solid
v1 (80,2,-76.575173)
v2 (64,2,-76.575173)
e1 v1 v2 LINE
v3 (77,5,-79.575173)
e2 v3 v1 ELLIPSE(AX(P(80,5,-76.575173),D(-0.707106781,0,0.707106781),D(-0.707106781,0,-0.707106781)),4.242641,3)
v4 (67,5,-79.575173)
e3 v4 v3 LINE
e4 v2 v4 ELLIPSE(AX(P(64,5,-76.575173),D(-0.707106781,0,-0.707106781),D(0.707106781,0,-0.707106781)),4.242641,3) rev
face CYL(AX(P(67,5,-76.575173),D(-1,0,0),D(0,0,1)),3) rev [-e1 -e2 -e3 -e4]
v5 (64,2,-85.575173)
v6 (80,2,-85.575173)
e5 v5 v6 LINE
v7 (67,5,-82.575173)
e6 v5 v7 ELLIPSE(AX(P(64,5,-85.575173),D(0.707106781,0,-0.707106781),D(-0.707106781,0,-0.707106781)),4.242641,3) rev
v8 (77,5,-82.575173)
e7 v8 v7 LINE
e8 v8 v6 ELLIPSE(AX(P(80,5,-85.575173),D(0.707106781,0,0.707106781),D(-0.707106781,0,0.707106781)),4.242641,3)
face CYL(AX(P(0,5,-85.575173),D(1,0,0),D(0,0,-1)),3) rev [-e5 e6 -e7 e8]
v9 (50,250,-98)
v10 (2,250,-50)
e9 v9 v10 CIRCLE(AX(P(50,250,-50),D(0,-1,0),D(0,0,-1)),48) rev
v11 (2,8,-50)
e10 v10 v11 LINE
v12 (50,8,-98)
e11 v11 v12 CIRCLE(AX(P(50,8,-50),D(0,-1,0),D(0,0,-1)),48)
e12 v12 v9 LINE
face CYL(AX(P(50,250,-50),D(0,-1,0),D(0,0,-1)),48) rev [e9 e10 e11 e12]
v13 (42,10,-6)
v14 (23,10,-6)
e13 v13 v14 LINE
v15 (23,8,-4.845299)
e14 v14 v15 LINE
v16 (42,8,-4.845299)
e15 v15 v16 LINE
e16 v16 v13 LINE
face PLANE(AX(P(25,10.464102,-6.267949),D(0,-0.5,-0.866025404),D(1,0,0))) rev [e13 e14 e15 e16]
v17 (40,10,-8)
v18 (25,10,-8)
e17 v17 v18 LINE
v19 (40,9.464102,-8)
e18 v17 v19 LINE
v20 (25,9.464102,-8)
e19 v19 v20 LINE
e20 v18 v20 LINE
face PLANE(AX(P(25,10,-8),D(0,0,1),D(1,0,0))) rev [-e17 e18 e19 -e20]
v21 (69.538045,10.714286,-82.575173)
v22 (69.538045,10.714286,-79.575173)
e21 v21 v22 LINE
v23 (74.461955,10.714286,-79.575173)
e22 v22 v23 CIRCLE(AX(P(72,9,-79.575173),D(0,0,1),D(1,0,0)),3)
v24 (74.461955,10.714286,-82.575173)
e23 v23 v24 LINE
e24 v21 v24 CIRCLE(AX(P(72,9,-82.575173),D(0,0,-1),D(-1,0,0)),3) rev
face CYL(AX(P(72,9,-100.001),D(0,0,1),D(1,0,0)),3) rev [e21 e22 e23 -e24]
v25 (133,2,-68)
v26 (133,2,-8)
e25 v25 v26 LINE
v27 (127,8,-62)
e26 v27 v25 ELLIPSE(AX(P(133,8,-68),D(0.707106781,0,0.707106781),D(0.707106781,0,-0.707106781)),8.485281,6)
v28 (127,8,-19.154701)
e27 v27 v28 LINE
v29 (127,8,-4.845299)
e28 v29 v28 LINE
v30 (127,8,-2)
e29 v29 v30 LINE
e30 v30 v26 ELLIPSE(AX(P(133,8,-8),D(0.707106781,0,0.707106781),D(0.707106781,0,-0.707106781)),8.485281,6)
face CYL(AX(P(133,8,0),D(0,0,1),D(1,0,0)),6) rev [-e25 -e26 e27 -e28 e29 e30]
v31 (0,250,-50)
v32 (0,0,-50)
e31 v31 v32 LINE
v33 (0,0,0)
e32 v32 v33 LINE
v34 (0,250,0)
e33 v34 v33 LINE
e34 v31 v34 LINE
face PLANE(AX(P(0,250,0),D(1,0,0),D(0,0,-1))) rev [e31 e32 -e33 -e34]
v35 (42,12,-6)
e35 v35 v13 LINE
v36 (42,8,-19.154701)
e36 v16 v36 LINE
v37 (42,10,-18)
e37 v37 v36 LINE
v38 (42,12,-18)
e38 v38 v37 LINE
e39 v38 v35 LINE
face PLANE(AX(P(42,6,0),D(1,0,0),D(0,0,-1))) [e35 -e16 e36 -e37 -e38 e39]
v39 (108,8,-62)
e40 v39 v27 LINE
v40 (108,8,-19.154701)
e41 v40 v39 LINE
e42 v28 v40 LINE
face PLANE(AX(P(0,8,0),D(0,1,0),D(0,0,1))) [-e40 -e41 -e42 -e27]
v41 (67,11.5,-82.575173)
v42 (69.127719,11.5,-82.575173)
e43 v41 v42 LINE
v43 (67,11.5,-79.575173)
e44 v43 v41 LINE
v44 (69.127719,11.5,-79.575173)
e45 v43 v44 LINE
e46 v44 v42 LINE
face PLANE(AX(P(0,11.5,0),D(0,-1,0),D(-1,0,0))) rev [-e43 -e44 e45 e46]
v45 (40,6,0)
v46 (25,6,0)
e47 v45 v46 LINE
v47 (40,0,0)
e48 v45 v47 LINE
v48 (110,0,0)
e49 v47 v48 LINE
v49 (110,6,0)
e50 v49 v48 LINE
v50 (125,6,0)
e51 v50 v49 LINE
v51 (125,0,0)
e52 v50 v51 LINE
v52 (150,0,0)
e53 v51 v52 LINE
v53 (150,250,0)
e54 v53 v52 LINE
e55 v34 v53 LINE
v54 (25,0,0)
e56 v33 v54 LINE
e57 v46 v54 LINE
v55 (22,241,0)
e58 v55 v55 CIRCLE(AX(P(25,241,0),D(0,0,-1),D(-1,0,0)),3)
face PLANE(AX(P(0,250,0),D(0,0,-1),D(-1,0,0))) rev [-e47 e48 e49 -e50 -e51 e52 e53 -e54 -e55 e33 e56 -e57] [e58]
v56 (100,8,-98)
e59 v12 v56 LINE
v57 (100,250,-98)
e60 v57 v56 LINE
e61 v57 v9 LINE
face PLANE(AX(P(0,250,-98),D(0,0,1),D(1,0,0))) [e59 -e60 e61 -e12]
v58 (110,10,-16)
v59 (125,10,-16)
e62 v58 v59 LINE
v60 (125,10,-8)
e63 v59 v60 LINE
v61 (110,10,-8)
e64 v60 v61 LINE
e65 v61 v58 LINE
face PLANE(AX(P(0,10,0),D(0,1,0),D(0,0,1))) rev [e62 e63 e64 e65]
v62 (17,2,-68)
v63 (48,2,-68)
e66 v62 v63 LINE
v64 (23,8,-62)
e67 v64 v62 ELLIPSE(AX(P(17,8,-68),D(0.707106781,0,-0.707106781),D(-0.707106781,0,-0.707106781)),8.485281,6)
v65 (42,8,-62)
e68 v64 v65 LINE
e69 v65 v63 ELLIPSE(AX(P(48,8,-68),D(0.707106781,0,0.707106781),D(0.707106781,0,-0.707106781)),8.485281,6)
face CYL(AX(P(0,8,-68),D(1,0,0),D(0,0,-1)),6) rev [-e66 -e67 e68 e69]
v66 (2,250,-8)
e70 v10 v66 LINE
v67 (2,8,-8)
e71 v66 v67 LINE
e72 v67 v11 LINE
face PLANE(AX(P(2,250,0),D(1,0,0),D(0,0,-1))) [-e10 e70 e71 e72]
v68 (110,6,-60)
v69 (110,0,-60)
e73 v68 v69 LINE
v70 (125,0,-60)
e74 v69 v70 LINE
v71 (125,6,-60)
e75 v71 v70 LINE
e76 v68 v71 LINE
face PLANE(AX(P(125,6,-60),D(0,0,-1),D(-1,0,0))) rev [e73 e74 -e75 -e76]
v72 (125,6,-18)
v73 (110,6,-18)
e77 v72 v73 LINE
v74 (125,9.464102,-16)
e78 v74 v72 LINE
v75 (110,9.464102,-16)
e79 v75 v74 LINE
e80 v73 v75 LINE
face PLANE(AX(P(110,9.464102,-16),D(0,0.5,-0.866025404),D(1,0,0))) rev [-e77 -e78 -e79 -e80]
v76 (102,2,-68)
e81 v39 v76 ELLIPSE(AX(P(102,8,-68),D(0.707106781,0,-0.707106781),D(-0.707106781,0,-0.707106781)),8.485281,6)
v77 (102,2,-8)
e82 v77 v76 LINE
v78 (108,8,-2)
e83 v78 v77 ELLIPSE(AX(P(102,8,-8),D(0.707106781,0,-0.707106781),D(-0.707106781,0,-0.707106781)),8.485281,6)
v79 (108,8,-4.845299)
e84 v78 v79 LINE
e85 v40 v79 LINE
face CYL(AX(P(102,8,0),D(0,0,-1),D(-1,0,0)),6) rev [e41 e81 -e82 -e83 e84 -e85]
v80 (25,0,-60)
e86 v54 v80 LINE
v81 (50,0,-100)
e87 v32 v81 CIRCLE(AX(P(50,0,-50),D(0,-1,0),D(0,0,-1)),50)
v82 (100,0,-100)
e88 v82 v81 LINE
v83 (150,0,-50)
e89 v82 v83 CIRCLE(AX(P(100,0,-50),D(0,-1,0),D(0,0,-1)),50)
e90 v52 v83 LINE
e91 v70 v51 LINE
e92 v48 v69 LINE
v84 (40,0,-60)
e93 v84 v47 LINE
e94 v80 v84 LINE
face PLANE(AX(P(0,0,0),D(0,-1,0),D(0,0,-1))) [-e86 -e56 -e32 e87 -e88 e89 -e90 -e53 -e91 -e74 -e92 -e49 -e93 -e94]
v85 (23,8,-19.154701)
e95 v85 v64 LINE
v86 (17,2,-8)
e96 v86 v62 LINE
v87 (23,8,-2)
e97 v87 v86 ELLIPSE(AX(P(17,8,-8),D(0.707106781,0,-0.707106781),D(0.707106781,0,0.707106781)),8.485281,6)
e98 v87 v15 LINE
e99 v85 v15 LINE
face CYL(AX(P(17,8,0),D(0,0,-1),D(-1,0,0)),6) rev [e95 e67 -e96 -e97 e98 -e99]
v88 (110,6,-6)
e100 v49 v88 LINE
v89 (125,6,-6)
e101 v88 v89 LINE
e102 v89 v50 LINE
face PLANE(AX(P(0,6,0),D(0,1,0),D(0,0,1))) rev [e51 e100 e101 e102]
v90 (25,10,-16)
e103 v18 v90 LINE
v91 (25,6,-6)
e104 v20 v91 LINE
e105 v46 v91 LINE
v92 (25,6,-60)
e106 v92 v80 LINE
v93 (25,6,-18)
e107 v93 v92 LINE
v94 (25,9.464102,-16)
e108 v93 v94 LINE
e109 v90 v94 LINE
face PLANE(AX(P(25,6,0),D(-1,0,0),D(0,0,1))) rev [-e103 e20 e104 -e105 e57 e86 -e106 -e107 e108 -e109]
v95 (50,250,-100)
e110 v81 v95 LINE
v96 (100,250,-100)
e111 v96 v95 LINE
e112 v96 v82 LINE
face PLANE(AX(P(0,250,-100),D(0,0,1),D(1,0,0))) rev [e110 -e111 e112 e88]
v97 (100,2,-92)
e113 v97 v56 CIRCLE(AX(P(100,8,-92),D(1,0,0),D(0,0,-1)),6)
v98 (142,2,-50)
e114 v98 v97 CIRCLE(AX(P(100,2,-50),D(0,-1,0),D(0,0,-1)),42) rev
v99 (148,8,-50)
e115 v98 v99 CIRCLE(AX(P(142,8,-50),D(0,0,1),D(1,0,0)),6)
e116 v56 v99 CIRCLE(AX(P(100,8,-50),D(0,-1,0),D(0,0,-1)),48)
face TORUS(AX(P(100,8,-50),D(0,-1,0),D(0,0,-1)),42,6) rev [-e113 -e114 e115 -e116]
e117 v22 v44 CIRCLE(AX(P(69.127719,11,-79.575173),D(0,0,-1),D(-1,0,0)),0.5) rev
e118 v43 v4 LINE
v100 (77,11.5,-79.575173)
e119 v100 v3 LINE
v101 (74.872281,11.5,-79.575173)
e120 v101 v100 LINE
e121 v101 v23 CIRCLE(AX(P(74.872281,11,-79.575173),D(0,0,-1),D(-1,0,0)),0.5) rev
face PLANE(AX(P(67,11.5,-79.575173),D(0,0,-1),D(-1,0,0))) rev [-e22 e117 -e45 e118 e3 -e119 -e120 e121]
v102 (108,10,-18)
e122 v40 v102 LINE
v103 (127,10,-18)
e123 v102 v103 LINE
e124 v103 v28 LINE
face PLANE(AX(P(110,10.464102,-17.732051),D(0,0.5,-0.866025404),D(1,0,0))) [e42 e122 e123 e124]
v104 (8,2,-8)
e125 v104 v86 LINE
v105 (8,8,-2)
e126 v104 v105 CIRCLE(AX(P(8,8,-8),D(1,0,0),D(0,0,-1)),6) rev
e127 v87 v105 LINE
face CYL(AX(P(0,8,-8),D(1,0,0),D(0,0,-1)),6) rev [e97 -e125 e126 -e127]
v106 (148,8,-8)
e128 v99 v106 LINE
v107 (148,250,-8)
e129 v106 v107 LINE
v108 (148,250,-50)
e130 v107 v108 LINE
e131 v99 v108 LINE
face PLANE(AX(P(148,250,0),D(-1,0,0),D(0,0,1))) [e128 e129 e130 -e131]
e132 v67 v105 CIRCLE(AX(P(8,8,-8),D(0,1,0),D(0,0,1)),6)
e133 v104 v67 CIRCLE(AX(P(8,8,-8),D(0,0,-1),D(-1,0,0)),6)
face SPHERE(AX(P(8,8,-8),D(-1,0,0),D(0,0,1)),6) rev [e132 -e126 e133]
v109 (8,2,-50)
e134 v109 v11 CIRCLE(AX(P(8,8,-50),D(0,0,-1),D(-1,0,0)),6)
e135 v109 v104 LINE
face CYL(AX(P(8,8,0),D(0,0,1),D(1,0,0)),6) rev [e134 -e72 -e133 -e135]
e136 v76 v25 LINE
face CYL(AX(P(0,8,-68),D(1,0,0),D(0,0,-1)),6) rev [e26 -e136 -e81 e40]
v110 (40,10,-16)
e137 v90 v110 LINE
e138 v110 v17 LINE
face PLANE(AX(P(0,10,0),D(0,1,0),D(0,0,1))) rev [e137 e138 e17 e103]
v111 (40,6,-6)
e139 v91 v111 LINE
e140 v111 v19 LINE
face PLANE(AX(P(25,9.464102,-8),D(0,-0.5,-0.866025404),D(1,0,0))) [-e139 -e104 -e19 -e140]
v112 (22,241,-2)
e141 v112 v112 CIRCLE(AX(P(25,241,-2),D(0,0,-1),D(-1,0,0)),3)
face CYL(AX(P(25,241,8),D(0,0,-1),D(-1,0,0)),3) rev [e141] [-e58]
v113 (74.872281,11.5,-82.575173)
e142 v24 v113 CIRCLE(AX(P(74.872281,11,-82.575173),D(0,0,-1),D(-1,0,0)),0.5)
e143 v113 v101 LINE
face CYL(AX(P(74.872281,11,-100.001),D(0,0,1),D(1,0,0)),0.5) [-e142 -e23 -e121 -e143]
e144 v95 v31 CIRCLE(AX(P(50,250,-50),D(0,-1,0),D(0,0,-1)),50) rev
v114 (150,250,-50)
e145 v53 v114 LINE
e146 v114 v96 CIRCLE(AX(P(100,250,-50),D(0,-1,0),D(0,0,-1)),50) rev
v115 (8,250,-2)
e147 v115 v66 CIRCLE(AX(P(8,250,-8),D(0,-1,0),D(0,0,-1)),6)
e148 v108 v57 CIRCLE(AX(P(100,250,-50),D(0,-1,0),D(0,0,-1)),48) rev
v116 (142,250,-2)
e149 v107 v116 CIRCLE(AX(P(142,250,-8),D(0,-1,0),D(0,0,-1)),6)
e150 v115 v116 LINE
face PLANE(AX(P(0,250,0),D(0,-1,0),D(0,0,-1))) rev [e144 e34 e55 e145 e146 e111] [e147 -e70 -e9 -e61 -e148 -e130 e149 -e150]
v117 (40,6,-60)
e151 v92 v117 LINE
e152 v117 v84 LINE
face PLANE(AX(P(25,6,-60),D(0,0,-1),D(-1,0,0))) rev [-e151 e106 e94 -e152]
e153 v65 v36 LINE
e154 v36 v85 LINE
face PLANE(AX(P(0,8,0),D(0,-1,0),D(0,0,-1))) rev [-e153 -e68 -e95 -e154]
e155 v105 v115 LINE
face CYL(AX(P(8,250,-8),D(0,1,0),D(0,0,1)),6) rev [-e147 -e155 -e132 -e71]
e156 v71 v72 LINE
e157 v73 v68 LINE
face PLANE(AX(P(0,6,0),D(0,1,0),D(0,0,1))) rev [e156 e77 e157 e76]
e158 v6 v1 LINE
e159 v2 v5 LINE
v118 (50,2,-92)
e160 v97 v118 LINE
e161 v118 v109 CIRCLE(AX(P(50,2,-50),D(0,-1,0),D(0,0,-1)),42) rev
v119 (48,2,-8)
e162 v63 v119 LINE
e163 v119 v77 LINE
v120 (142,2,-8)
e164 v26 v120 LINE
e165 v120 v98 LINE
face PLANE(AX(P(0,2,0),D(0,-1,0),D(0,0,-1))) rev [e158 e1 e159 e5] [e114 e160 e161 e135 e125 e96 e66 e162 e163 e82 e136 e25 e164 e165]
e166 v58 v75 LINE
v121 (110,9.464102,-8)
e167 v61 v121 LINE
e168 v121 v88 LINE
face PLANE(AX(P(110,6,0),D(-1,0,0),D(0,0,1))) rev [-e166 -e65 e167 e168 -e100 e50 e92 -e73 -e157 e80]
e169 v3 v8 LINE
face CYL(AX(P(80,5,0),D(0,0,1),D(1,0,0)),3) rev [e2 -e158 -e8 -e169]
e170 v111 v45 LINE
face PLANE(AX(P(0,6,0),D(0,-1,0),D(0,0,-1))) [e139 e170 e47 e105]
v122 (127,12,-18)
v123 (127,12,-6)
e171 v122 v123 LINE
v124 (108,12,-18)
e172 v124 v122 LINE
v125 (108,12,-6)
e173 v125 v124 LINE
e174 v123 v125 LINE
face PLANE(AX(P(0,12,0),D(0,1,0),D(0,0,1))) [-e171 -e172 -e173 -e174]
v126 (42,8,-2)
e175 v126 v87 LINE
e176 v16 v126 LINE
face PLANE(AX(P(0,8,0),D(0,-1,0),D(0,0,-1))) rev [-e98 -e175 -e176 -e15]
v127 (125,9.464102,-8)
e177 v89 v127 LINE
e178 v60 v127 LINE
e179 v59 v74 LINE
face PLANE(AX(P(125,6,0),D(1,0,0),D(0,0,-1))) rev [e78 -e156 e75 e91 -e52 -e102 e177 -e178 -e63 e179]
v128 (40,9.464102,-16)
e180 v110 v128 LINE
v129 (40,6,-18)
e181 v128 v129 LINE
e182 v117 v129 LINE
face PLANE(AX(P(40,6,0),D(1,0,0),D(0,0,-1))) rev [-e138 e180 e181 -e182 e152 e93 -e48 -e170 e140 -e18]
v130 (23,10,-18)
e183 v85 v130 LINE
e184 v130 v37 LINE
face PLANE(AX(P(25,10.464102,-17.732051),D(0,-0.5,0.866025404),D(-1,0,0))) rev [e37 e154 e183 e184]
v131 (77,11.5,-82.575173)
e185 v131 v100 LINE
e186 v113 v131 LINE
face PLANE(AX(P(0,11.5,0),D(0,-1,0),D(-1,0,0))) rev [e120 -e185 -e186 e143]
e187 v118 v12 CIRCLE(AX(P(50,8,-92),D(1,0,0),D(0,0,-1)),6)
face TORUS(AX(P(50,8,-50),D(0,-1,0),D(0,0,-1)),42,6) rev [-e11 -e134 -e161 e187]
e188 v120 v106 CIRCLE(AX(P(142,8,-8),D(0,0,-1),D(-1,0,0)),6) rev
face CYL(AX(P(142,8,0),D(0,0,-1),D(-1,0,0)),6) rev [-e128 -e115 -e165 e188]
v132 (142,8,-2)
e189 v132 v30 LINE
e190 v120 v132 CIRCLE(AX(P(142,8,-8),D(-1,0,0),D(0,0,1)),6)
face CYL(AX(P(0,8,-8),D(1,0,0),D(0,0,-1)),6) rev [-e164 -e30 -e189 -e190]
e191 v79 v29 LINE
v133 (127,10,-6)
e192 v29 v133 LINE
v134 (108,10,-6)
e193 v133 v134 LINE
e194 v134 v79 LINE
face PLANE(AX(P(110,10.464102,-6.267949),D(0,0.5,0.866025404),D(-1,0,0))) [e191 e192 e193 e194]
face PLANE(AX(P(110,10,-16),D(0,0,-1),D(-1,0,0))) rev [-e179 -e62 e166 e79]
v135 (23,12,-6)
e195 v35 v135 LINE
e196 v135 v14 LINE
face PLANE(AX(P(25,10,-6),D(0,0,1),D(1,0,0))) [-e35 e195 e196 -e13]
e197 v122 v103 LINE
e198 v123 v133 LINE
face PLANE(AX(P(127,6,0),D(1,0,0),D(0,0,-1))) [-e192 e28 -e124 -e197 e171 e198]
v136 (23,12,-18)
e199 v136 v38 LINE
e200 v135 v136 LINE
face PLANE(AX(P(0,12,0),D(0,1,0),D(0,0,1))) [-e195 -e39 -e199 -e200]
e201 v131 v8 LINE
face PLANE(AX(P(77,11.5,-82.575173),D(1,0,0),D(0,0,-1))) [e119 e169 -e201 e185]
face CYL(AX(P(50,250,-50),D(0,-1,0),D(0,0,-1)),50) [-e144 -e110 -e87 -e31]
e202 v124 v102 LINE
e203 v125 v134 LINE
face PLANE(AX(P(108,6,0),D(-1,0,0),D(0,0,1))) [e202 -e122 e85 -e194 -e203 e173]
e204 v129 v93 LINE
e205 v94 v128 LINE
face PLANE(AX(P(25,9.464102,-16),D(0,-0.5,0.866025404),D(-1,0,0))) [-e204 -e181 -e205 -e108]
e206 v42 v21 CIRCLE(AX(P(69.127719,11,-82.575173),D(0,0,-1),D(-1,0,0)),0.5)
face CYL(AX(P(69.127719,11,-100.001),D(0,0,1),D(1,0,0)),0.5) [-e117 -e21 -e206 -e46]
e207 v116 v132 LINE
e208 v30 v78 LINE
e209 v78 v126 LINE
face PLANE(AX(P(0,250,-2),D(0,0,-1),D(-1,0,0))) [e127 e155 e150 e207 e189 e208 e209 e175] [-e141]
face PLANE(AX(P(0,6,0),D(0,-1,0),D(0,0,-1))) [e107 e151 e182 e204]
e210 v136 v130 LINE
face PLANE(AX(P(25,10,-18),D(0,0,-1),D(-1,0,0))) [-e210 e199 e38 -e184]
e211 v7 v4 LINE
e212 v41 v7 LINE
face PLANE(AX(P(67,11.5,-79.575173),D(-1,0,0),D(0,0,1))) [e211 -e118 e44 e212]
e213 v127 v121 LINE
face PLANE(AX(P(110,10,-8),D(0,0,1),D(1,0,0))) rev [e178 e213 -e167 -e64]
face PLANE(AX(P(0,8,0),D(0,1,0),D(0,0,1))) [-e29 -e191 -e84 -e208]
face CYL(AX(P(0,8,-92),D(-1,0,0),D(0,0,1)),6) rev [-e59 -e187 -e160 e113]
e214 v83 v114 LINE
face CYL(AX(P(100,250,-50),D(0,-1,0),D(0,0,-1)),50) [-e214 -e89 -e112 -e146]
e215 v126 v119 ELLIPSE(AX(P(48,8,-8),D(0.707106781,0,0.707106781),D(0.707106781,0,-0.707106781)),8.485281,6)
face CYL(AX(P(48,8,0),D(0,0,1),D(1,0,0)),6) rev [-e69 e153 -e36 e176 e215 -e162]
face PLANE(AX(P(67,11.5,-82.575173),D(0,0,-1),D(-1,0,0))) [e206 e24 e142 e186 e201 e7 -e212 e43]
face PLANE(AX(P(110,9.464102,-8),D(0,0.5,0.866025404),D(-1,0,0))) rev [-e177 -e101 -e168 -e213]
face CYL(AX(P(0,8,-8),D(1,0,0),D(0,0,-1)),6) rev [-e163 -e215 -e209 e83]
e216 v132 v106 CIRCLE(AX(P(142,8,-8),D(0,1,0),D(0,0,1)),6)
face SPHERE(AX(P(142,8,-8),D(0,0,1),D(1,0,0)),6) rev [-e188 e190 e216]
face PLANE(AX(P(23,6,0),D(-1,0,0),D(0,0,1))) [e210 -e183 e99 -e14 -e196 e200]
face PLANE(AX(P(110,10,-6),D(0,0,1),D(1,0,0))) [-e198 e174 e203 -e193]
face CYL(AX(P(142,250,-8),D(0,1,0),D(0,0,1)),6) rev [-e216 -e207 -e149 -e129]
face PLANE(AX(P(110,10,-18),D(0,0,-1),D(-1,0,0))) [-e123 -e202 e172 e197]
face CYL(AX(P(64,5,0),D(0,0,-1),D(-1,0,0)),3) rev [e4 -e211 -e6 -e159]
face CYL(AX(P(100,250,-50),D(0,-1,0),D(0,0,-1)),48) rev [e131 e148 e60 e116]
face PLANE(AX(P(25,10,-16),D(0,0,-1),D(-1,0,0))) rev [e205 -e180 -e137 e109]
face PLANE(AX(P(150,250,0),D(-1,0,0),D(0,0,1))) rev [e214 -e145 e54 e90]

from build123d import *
from OCP.BRepFilletAPI import BRepFilletAPI_MakeChamfer

# Parameters (mm, degrees)
SKETCH1_W           = 150
SKETCH1_H           = 100
BOSS_EXTRUDE1_DEPTH = 250
FILLET1_R           = 50
SKETCH4_W           = 15
SKETCH4_H           = 60
CUT_EXTRUDE2_DEPTH  = 6
SKETCH5_W           = 15
SKETCH5_H           = 8
CUT_EXTRUDE3_DEPTH  = 4
CHAMFER2_SIZE       = 2
CHAMFER2_SIZE2      = 3.464101615
SHELL1_START        = 42
SHELL1_OUTLINE_W    = 248
SHELL1_OUTLINE_H    = 96
SHELL1_DEPTH        = 66
SHELL1_START_2      = 2
SHELL1_2_DEPTH      = 40
SHELL1_START_3      = 108
SHELL1_3_DEPTH      = 40
SHELL1_4_DEPTH      = 21
SHELL1_START_4      = 127
SHELL1_5_DEPTH      = 21
SHELL1_6_DEPTH      = 250
FILLET4_R           = 6
SKETCH6_W           = 10
SKETCH6_H           = 3
EXTRUDE_THIN1_DEPTH = 9.5
FILLET5_R           = 3
CUT_EXTRUDE4_REACH  = 304.212
SKETCH7_R           = 3
FILLET6_R           = 0.5
SKETCH8_R           = 3
CUT_EXTRUDE5_DEPTH  = 10


with BuildPart() as part:
    # Sketch1 → Boss-Extrude1 (new body)
    with BuildSketch(Plane(origin=(0, 0, 0), x_dir=(1, 0, 0), z_dir=(0, 1, 0))):
        with Locations((75, 50)):
            Rectangle(SKETCH1_W, SKETCH1_H)
    extrude(amount=BOSS_EXTRUDE1_DEPTH)

    # Fillet1
    fillet1_edges = [part.edges().sort_by_distance(p)[0] for p in [
        (0, 125, -100),
        (150, 125, -100),
    ]]
    fillet(fillet1_edges, radius=FILLET1_R)

    # Sketch4 → Cut-Extrude2 (cut)
    with BuildSketch(Plane.XZ):
        with Locations((32.5, -30)):
            Rectangle(SKETCH4_W, SKETCH4_H)
        with Locations((117.5, -30)):
            Rectangle(SKETCH4_W, SKETCH4_H)
    extrude(amount=-CUT_EXTRUDE2_DEPTH, mode=Mode.SUBTRACT)

    # Sketch5 → Cut-Extrude3 (cut)
    with BuildSketch(Plane.XZ.offset(-6)):
        with Locations((32.5, -12)):
            Rectangle(SKETCH5_W, SKETCH5_H)
        with Locations((117.5, -12)):
            Rectangle(SKETCH5_W, SKETCH5_H)
    extrude(amount=-CUT_EXTRUDE3_DEPTH, mode=Mode.SUBTRACT)

    # Chamfer2: one chamfer whose edges measure the first distance from different faces: ONE call of the kernel's chamfer builder (chamfer() names one face for all edges)
    chamfer2_edges_1 = [part.edges().sort_by_distance(p)[0] for p in [
        (32.5, 6, -16),
    ]]
    chamfer2_side_1 = [part.faces().sort_by_distance(p)[0] for p in [
        (32.5, 6, -38),
    ]]
    chamfer2_edges_2 = [part.edges().sort_by_distance(p)[0] for p in [
        (32.5, 6, -8),
    ]]
    chamfer2_side_2 = [part.faces().sort_by_distance(p)[0] for p in [
        (32.5, 6, -4),
    ]]
    chamfer2_edges_3 = [part.edges().sort_by_distance(p)[0] for p in [
        (117.5, 6, -16),
    ]]
    chamfer2_side_3 = [part.faces().sort_by_distance(p)[0] for p in [
        (117.5, 6, -38),
    ]]
    chamfer2_edges_4 = [part.edges().sort_by_distance(p)[0] for p in [
        (117.5, 6, -8),
    ]]
    chamfer2_side_4 = [part.faces().sort_by_distance(p)[0] for p in [
        (117.5, 6, -4),
    ]]
    chamfer2 = BRepFilletAPI_MakeChamfer(part.part.solid().wrapped)
    for e in chamfer2_edges_1:
        chamfer2.Add(CHAMFER2_SIZE, CHAMFER2_SIZE2, e.wrapped, chamfer2_side_1[0].wrapped)  # the first distance lies on this face
    for e in chamfer2_edges_2:
        chamfer2.Add(CHAMFER2_SIZE, CHAMFER2_SIZE2, e.wrapped, chamfer2_side_2[0].wrapped)  # the first distance lies on this face
    for e in chamfer2_edges_3:
        chamfer2.Add(CHAMFER2_SIZE, CHAMFER2_SIZE2, e.wrapped, chamfer2_side_3[0].wrapped)  # the first distance lies on this face
    for e in chamfer2_edges_4:
        chamfer2.Add(CHAMFER2_SIZE, CHAMFER2_SIZE2, e.wrapped, chamfer2_side_4[0].wrapped)  # the first distance lies on this face
    add(Compound.cast(chamfer2.Shape()), mode=Mode.REPLACE)

    # Shell1: read off the stored shape, not the designer's step
    # Shell1 outline → Shell1 (cut)
    with BuildSketch(Plane.YZ.offset(SHELL1_START)):
        with Locations((126, -50)):
            Rectangle(SHELL1_OUTLINE_W, SHELL1_OUTLINE_H)
    extrude(amount=SHELL1_DEPTH, mode=Mode.SUBTRACT)

    # Shell1 2 outline → Shell1 2 (cut)
    with BuildSketch(Plane.YZ.offset(SHELL1_START_2)):
        Polygon((8, -2), (8, -4.845299462), (10, -6), (12, -6), (12, -18), (10, -18), (8, -19.154700538), (8, -62), (2, -62), (2, -98), (250, -98), (250, -2), align=None)
    extrude(amount=SHELL1_2_DEPTH, mode=Mode.SUBTRACT)

    # Shell1 3 outline → Shell1 3 (cut)
    with BuildSketch(Plane.YZ.offset(SHELL1_START_3)):
        Polygon((8, -2), (8, -4.845299462), (10, -6), (12, -6), (12, -18), (10, -18), (8, -19.154700538), (8, -62), (2, -62), (2, -98), (250, -98), (250, -2), align=None)
    extrude(amount=SHELL1_3_DEPTH, mode=Mode.SUBTRACT)

    # Shell1 4 outline → Shell1 4 (cut)
    with BuildSketch(Plane.YZ.offset(SHELL1_START_2)):
        Polygon((10, -6), (8, -4.845299462), (8, -2), (2, -2), (2, -62), (8, -62), (8, -19.154700538), (10, -18), (12, -18), (12, -6), align=None)
    extrude(amount=SHELL1_4_DEPTH, mode=Mode.SUBTRACT)

    # Shell1 5 outline → Shell1 5 (cut)
    with BuildSketch(Plane.YZ.offset(SHELL1_START_4)):
        Polygon((10, -6), (8, -4.845299462), (8, -2), (2, -2), (2, -62), (8, -62), (8, -19.154700538), (10, -18), (12, -18), (12, -6), align=None)
    extrude(amount=SHELL1_5_DEPTH, mode=Mode.SUBTRACT)

    # Shell1 6 outline → Shell1 6 (add)
    with BuildSketch(Plane(origin=(0, 0, 0), x_dir=(1, 0, 0), z_dir=(0, 1, 0))):
        with BuildLine():
            Line((114, 98), (100, 98))
            ThreePointArc((100, 98), (133.941125497, 83.941125497), (148, 50))
            Line((148, 50), (148, 64))
            ThreePointArc((148, 64), (135.355339059, 85.355339059), (114, 98))
        make_face()
        with BuildLine():
            ThreePointArc((36, 98), (14.644660941, 85.355339059), (2, 64))
            Line((2, 64), (2, 50))
            ThreePointArc((2, 50), (16.058874503, 83.941125497), (50, 98))
            Line((50, 98), (36, 98))
        make_face()
    extrude(amount=SHELL1_6_DEPTH)

    # Fillet4
    fillet4_edges = [part.edges().sort_by_distance(p)[0] for p in [
        (12.5, 2, -2),
        (2, 2, -26),
        (16.058874503, 2, -83.941125497),
        (75, 2, -98),
        (133.941125497, 2, -83.941125497),
        (148, 2, -26),
        (137.5, 2, -2),
        (108, 2, -32),
        (127, 2, -32),
        (117.5, 2, -62),
        (75, 2, -2),
        (23, 2, -32),
        (42, 2, -32),
        (32.5, 2, -62),
        (2, 126, -2),
        (148, 126, -2),
    ]]
    fillet(fillet4_edges, radius=FILLET4_R - 0.0001)  # a hair under: the kernel refuses the full size

    # Sketch6 → Extrude-Thin1 (add)
    with BuildSketch(Plane(origin=(0, 2, 0), x_dir=(1, 0, 0), z_dir=(0, 1, 0))):
        with Locations((72, 81.075172512)):
            Rectangle(SKETCH6_W, SKETCH6_H)
    extrude(amount=EXTRUDE_THIN1_DEPTH)

    # Fillet5
    fillet5_edges = [part.edges().sort_by_distance(p)[0] for p in [
        (72, 2, -79.575172512),
        (67, 2, -81.075172512),
        (72, 2, -82.575172512),
        (77, 2, -81.075172512),
    ]]
    fillet(fillet5_edges, radius=FILLET5_R)

    # Sketch7 → Cut-Extrude4 (cut, up to next)
    with BuildSketch(Plane.XY.offset(-79.575172512), mode=Mode.PRIVATE) as cut_extrude4_sk1:
        with Locations((72, 9)):
            Circle(SKETCH7_R)
    cut_extrude4_tool1 = extrude(cut_extrude4_sk1.sketch, amount=-CUT_EXTRUDE4_REACH, mode=Mode.PRIVATE) & part.part
    add(cut_extrude4_tool1.solids().sort_by_distance((72, 9, -79.575173))[0], mode=Mode.SUBTRACT)

    # Fillet6
    fillet6_edges = [part.edges().sort_by_distance(p)[0] for p in [
        (73.658312395, 11.5, -81.075172512),
        (70.341687605, 11.5, -81.075172512),
    ]]
    fillet(fillet6_edges, radius=FILLET6_R)

    # Sketch8 → Cut-Extrude5 (cut)
    with BuildSketch(Plane(origin=(0, 0, -2), x_dir=(-1, 0, 0), z_dir=(0, 0, -1))):
        with Locations((-25, 241)):
            Circle(SKETCH8_R)
    extrude(amount=-CUT_EXTRUDE5_DEPTH, mode=Mode.SUBTRACT)


solid = part.part
